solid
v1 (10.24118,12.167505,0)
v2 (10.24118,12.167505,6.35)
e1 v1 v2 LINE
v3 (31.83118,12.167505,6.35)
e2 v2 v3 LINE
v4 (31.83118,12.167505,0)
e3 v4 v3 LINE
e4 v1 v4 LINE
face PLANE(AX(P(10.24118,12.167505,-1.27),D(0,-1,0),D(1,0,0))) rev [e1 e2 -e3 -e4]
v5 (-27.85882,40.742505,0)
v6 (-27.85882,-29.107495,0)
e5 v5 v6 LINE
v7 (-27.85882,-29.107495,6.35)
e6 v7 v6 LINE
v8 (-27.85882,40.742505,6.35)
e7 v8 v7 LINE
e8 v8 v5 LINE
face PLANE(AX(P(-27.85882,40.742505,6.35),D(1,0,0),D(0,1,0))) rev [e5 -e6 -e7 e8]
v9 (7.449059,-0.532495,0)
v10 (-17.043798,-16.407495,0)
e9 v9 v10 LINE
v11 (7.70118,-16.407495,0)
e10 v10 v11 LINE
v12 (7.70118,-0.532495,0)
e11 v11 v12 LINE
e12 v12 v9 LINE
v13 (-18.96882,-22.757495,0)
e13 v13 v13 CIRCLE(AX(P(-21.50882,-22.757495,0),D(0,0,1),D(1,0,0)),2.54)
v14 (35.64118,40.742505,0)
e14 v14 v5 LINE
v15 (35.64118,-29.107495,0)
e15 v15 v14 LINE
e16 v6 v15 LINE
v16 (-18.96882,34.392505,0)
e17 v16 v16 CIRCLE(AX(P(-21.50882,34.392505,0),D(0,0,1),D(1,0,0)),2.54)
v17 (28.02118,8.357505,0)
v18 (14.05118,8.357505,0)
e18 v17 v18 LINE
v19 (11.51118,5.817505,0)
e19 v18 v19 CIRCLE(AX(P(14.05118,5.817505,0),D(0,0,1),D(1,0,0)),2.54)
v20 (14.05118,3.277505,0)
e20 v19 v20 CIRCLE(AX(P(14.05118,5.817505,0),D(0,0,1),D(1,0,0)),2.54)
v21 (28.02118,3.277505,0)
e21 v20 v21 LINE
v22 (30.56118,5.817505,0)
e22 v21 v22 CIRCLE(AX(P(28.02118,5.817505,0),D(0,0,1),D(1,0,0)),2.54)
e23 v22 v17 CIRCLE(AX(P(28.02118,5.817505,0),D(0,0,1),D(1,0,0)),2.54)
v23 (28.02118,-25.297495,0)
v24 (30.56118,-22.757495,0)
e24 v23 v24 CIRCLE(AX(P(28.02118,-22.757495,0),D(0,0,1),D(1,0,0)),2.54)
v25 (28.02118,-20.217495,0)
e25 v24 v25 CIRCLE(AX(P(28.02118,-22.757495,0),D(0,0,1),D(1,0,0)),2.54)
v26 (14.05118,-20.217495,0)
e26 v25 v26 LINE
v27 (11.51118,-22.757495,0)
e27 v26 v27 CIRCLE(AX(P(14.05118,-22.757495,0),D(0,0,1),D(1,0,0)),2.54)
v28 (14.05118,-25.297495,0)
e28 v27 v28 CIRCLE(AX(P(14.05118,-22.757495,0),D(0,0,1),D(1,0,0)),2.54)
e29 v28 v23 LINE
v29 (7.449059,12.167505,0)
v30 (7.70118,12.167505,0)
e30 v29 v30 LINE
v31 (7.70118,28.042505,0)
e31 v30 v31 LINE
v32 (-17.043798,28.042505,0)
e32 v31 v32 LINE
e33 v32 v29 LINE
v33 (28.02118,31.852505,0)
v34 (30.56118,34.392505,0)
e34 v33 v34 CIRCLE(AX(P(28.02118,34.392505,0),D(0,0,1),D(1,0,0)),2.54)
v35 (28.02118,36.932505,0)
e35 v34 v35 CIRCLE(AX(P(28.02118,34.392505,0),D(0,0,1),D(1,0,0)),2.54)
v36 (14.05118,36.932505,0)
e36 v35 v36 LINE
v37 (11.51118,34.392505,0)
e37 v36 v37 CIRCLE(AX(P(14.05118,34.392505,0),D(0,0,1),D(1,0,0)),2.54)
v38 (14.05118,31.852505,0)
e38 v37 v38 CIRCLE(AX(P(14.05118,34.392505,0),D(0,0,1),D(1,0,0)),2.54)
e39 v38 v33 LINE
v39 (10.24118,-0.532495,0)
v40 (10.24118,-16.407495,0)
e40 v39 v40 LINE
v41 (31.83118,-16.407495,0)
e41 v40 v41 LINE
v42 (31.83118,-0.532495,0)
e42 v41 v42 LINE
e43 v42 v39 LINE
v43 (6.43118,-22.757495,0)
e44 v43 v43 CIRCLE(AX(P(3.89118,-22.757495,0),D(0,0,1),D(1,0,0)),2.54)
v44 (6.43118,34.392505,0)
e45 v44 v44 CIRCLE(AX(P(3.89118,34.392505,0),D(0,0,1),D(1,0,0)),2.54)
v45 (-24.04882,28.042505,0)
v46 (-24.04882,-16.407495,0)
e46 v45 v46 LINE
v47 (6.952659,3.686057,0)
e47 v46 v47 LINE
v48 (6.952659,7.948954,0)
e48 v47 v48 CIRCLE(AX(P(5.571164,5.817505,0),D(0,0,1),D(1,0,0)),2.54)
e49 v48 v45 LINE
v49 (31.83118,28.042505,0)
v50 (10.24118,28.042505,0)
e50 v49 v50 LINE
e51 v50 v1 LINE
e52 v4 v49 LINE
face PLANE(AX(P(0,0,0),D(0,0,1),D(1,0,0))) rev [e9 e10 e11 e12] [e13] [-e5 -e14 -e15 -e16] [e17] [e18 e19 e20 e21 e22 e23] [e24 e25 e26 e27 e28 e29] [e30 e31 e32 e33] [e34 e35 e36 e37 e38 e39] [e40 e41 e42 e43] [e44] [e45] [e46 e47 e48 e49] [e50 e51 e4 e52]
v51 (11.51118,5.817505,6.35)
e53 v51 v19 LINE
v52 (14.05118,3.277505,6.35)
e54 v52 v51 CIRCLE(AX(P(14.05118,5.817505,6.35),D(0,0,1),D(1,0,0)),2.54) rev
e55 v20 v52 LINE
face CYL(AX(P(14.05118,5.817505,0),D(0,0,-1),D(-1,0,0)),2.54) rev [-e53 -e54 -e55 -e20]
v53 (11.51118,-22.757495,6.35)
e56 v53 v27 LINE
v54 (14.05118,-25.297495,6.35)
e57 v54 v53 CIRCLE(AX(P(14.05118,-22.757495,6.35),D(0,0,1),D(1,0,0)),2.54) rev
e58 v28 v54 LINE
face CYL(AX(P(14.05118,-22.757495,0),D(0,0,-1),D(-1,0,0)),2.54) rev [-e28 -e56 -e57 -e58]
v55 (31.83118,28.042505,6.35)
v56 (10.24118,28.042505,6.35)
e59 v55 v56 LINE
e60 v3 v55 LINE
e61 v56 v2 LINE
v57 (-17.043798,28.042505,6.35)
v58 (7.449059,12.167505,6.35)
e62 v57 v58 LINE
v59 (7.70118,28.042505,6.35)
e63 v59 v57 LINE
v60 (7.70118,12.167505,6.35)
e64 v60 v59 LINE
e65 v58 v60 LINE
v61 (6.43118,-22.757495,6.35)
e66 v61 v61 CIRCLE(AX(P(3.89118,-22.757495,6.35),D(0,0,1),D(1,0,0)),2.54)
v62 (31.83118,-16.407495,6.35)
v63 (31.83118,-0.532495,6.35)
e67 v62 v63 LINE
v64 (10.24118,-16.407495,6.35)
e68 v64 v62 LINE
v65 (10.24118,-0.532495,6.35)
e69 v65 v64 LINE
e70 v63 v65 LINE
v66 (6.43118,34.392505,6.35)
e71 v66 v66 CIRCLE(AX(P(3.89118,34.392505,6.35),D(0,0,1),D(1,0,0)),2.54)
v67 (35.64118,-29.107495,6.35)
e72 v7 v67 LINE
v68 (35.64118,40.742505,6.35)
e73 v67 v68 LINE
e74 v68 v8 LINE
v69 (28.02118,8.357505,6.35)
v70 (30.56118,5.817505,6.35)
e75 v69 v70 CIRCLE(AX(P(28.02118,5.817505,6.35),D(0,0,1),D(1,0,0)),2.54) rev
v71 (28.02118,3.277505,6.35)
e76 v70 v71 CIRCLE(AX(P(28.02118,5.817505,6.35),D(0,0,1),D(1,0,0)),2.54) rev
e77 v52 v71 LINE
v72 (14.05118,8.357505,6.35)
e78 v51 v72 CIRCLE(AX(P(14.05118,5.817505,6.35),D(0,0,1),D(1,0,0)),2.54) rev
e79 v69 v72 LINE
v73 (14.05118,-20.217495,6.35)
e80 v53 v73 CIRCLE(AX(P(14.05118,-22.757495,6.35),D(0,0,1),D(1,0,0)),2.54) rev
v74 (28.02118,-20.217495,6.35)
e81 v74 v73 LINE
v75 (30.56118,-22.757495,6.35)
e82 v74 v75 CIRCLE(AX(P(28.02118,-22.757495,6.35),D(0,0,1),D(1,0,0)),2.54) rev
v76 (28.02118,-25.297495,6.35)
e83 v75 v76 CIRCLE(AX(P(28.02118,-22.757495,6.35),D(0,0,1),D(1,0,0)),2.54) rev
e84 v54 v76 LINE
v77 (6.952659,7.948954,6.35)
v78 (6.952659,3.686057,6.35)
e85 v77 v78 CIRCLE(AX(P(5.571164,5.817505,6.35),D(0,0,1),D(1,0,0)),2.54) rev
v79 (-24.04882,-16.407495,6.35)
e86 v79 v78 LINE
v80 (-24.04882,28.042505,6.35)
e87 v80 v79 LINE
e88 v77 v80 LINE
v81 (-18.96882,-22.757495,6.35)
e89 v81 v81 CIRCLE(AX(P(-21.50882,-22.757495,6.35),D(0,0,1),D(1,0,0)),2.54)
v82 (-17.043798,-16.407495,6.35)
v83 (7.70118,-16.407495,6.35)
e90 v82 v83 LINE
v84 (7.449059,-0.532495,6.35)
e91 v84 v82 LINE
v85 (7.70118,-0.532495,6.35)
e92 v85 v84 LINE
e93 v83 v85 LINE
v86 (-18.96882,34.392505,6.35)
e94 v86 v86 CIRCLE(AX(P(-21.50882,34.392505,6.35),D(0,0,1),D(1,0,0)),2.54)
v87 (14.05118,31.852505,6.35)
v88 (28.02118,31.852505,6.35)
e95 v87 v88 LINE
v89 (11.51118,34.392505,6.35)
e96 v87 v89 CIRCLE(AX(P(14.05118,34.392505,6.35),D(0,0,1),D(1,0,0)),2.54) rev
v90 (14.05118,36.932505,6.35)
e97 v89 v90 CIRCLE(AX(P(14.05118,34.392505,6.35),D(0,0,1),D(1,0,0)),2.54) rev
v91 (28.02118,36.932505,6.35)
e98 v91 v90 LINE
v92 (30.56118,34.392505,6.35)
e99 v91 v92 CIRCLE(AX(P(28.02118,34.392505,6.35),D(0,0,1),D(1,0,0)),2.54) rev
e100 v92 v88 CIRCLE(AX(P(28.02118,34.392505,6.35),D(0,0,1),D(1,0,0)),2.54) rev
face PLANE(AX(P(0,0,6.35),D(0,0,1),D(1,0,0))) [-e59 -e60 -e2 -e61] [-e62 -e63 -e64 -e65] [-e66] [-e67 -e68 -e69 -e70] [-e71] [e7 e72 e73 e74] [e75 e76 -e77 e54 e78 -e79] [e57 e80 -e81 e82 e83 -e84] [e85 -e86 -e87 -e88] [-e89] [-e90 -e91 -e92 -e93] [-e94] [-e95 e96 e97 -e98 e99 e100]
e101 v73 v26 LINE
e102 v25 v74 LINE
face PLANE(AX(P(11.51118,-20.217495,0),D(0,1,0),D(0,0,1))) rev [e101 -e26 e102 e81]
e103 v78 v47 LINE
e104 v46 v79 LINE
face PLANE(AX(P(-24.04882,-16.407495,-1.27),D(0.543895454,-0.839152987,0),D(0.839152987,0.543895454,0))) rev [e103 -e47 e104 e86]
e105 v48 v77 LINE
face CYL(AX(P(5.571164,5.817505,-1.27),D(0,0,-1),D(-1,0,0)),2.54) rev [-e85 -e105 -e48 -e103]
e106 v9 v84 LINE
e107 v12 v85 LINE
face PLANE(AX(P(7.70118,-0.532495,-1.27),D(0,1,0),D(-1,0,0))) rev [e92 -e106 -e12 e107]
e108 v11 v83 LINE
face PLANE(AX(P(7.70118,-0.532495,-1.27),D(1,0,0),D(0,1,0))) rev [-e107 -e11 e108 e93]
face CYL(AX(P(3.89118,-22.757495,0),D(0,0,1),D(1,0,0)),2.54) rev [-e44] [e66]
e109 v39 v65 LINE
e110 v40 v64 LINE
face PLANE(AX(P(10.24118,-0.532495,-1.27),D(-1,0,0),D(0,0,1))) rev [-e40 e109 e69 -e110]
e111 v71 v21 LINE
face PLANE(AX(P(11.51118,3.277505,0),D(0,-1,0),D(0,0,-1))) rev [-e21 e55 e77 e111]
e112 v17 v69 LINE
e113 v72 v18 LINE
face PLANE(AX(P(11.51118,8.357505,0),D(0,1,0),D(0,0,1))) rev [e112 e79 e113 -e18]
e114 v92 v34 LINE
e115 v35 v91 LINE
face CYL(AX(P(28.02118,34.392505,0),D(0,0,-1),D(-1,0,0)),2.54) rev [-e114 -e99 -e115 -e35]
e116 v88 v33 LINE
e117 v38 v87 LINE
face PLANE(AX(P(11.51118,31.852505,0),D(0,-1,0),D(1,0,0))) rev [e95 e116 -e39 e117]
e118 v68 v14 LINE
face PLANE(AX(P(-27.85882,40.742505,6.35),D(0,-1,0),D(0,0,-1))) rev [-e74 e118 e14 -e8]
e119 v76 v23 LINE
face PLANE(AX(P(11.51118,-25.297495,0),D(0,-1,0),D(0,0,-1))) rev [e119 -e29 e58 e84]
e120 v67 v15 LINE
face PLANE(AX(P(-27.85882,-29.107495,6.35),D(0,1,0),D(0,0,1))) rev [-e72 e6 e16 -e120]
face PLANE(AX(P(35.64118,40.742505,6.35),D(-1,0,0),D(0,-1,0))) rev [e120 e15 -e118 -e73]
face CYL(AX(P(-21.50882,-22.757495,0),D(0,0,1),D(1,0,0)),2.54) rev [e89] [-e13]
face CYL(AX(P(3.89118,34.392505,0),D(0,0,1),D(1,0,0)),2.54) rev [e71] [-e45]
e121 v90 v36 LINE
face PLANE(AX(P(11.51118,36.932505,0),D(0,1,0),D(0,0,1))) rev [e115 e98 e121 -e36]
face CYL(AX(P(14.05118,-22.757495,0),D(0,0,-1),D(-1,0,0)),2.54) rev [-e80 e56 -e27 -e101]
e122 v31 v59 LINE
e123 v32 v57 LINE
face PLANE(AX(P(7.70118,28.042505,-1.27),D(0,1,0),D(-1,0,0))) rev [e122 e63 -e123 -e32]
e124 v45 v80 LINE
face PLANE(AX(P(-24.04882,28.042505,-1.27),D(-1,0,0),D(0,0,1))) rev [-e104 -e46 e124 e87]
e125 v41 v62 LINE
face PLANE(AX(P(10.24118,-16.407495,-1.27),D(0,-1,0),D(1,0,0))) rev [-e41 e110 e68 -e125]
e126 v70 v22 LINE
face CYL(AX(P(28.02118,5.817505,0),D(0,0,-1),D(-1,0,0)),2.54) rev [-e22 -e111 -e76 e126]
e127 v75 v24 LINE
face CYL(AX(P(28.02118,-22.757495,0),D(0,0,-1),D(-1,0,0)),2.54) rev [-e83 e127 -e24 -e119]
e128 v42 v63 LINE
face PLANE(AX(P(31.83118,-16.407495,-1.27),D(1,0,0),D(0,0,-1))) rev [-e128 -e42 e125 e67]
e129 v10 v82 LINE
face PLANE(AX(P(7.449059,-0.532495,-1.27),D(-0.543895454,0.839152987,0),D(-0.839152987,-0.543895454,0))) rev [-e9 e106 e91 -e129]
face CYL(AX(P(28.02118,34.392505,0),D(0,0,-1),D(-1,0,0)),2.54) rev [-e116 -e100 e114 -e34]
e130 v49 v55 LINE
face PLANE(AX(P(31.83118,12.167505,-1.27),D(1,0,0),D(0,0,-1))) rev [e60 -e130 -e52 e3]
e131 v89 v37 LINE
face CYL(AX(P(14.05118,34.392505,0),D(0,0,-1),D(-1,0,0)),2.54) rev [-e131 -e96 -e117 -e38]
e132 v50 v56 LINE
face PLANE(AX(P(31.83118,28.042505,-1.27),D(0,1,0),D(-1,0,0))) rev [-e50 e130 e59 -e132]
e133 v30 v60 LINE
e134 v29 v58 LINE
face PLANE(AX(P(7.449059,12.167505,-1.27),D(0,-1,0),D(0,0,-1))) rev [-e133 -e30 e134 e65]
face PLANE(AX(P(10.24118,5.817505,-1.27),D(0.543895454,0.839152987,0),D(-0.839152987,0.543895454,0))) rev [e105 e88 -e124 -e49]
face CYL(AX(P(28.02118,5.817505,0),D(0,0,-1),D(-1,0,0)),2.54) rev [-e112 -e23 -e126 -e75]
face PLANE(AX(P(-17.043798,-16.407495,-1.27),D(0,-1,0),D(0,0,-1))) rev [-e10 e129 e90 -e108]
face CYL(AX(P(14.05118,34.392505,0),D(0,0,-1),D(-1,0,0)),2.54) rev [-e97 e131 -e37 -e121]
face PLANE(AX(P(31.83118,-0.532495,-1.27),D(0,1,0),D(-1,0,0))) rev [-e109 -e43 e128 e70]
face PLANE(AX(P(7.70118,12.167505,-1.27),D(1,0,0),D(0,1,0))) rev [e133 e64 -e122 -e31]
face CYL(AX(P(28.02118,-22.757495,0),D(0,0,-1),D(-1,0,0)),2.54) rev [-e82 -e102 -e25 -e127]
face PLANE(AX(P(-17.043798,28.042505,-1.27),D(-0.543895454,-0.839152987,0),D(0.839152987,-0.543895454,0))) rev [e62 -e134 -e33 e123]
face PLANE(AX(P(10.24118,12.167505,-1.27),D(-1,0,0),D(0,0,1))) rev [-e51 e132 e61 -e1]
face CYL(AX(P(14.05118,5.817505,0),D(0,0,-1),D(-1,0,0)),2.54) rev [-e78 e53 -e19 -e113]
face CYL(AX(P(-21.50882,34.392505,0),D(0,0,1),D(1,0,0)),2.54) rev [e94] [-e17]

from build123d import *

# Parameters (mm, degrees)
SKETCH1_W           = 63.5
SKETCH1_H           = 69.85
BOSS_EXTRUDE1_DEPTH = 6.35
SKETCH2_R           = 2.54
SKETCH2_W           = 19.05
SKETCH2_H           = 5.08
CUT_EXTRUDE1_DEPTH  = 6.35
FILLET1_R           = 2.54
SKETCH3_W           = 21.59
SKETCH3_H           = 15.875
CUT_EXTRUDE2_DEPTH  = 7.62
FILLET3_R           = 2.54


with BuildPart() as part:
    # Sketch1 → Boss-Extrude1 (new body)
    with BuildSketch(Plane.XY):
        with Locations((3.891179619, 5.817505184)):
            Rectangle(SKETCH1_W, SKETCH1_H)
    extrude(amount=BOSS_EXTRUDE1_DEPTH)

    # Sketch2 → Cut-Extrude1 (cut)
    with BuildSketch(Plane.XY.offset(6.35)):
        with Locations((-21.508820381, 34.392505184)):
            Circle(SKETCH2_R)
        with Locations((3.891179619, 34.392505184)):
            Circle(SKETCH2_R)
        with Locations((-21.508820381, -22.757494816)):
            Circle(SKETCH2_R)
        with Locations((3.891179619, -22.757494816)):
            Circle(SKETCH2_R)
        with Locations((21.036179619, 34.392505184)):
            Rectangle(SKETCH2_W, SKETCH2_H)
        with Locations((21.036179619, -22.757494816)):
            Rectangle(SKETCH2_W, SKETCH2_H)
        with Locations((21.036179619, 5.817505184)):
            Rectangle(SKETCH2_W, SKETCH2_H)
    extrude(amount=-CUT_EXTRUDE1_DEPTH, mode=Mode.SUBTRACT)

    # Fillet1
    fillet1_edges = [part.edges().sort_by_distance(p)[0] for p in [
        (30.561179619, 31.852505184, 3.175),
        (30.561179619, 3.277505184, 3.175),
        (30.561179619, -25.297494816, 3.175),
        (30.561179619, -20.217494816, 3.175),
        (30.561179619, 8.357505184, 3.175),
        (30.561179619, 36.932505184, 3.175),
        (11.511179619, -20.217494816, 3.175),
        (11.511179619, 8.357505184, 3.175),
        (11.511179619, 36.932505184, 3.175),
        (11.511179619, 31.852505184, 3.175),
        (11.511179619, 3.277505184, 3.175),
        (11.511179619, -25.297494816, 3.175),
    ]]
    fillet(fillet1_edges, radius=FILLET1_R - 0.0001)  # a hair under: the kernel refuses the full size

    # Sketch3 → Cut-Extrude2 (cut)
    with BuildSketch(Plane.XY.offset(6.35)):
        Polygon((-17.043797687, -16.407494816), (7.701179619, -16.407494816), (7.701179619, -0.532494816), (7.449059455, -0.532494816), align=None)
        with Locations((21.036179619, -8.469994816)):
            Rectangle(SKETCH3_W, SKETCH3_H)
        Polygon((-24.048820381, -16.407494816), (10.241179619, 5.817505184), (-24.048820381, 28.042505184), align=None)
        Polygon((-17.043797687, 28.042505184), (7.449059455, 12.167505184), (7.701179619, 12.167505184), (7.701179619, 28.042505184), align=None)
        with Locations((21.036179619, 20.105005184)):
            Rectangle(SKETCH3_W, SKETCH3_H)
    extrude(amount=-CUT_EXTRUDE2_DEPTH, mode=Mode.SUBTRACT)

    # Fillet3
    fillet3_edges = [part.edges().sort_by_distance(p)[0] for p in [
        (10.241179619, 5.817505184, 3.175),
    ]]
    fillet(fillet3_edges, radius=FILLET3_R)


solid = part.part
